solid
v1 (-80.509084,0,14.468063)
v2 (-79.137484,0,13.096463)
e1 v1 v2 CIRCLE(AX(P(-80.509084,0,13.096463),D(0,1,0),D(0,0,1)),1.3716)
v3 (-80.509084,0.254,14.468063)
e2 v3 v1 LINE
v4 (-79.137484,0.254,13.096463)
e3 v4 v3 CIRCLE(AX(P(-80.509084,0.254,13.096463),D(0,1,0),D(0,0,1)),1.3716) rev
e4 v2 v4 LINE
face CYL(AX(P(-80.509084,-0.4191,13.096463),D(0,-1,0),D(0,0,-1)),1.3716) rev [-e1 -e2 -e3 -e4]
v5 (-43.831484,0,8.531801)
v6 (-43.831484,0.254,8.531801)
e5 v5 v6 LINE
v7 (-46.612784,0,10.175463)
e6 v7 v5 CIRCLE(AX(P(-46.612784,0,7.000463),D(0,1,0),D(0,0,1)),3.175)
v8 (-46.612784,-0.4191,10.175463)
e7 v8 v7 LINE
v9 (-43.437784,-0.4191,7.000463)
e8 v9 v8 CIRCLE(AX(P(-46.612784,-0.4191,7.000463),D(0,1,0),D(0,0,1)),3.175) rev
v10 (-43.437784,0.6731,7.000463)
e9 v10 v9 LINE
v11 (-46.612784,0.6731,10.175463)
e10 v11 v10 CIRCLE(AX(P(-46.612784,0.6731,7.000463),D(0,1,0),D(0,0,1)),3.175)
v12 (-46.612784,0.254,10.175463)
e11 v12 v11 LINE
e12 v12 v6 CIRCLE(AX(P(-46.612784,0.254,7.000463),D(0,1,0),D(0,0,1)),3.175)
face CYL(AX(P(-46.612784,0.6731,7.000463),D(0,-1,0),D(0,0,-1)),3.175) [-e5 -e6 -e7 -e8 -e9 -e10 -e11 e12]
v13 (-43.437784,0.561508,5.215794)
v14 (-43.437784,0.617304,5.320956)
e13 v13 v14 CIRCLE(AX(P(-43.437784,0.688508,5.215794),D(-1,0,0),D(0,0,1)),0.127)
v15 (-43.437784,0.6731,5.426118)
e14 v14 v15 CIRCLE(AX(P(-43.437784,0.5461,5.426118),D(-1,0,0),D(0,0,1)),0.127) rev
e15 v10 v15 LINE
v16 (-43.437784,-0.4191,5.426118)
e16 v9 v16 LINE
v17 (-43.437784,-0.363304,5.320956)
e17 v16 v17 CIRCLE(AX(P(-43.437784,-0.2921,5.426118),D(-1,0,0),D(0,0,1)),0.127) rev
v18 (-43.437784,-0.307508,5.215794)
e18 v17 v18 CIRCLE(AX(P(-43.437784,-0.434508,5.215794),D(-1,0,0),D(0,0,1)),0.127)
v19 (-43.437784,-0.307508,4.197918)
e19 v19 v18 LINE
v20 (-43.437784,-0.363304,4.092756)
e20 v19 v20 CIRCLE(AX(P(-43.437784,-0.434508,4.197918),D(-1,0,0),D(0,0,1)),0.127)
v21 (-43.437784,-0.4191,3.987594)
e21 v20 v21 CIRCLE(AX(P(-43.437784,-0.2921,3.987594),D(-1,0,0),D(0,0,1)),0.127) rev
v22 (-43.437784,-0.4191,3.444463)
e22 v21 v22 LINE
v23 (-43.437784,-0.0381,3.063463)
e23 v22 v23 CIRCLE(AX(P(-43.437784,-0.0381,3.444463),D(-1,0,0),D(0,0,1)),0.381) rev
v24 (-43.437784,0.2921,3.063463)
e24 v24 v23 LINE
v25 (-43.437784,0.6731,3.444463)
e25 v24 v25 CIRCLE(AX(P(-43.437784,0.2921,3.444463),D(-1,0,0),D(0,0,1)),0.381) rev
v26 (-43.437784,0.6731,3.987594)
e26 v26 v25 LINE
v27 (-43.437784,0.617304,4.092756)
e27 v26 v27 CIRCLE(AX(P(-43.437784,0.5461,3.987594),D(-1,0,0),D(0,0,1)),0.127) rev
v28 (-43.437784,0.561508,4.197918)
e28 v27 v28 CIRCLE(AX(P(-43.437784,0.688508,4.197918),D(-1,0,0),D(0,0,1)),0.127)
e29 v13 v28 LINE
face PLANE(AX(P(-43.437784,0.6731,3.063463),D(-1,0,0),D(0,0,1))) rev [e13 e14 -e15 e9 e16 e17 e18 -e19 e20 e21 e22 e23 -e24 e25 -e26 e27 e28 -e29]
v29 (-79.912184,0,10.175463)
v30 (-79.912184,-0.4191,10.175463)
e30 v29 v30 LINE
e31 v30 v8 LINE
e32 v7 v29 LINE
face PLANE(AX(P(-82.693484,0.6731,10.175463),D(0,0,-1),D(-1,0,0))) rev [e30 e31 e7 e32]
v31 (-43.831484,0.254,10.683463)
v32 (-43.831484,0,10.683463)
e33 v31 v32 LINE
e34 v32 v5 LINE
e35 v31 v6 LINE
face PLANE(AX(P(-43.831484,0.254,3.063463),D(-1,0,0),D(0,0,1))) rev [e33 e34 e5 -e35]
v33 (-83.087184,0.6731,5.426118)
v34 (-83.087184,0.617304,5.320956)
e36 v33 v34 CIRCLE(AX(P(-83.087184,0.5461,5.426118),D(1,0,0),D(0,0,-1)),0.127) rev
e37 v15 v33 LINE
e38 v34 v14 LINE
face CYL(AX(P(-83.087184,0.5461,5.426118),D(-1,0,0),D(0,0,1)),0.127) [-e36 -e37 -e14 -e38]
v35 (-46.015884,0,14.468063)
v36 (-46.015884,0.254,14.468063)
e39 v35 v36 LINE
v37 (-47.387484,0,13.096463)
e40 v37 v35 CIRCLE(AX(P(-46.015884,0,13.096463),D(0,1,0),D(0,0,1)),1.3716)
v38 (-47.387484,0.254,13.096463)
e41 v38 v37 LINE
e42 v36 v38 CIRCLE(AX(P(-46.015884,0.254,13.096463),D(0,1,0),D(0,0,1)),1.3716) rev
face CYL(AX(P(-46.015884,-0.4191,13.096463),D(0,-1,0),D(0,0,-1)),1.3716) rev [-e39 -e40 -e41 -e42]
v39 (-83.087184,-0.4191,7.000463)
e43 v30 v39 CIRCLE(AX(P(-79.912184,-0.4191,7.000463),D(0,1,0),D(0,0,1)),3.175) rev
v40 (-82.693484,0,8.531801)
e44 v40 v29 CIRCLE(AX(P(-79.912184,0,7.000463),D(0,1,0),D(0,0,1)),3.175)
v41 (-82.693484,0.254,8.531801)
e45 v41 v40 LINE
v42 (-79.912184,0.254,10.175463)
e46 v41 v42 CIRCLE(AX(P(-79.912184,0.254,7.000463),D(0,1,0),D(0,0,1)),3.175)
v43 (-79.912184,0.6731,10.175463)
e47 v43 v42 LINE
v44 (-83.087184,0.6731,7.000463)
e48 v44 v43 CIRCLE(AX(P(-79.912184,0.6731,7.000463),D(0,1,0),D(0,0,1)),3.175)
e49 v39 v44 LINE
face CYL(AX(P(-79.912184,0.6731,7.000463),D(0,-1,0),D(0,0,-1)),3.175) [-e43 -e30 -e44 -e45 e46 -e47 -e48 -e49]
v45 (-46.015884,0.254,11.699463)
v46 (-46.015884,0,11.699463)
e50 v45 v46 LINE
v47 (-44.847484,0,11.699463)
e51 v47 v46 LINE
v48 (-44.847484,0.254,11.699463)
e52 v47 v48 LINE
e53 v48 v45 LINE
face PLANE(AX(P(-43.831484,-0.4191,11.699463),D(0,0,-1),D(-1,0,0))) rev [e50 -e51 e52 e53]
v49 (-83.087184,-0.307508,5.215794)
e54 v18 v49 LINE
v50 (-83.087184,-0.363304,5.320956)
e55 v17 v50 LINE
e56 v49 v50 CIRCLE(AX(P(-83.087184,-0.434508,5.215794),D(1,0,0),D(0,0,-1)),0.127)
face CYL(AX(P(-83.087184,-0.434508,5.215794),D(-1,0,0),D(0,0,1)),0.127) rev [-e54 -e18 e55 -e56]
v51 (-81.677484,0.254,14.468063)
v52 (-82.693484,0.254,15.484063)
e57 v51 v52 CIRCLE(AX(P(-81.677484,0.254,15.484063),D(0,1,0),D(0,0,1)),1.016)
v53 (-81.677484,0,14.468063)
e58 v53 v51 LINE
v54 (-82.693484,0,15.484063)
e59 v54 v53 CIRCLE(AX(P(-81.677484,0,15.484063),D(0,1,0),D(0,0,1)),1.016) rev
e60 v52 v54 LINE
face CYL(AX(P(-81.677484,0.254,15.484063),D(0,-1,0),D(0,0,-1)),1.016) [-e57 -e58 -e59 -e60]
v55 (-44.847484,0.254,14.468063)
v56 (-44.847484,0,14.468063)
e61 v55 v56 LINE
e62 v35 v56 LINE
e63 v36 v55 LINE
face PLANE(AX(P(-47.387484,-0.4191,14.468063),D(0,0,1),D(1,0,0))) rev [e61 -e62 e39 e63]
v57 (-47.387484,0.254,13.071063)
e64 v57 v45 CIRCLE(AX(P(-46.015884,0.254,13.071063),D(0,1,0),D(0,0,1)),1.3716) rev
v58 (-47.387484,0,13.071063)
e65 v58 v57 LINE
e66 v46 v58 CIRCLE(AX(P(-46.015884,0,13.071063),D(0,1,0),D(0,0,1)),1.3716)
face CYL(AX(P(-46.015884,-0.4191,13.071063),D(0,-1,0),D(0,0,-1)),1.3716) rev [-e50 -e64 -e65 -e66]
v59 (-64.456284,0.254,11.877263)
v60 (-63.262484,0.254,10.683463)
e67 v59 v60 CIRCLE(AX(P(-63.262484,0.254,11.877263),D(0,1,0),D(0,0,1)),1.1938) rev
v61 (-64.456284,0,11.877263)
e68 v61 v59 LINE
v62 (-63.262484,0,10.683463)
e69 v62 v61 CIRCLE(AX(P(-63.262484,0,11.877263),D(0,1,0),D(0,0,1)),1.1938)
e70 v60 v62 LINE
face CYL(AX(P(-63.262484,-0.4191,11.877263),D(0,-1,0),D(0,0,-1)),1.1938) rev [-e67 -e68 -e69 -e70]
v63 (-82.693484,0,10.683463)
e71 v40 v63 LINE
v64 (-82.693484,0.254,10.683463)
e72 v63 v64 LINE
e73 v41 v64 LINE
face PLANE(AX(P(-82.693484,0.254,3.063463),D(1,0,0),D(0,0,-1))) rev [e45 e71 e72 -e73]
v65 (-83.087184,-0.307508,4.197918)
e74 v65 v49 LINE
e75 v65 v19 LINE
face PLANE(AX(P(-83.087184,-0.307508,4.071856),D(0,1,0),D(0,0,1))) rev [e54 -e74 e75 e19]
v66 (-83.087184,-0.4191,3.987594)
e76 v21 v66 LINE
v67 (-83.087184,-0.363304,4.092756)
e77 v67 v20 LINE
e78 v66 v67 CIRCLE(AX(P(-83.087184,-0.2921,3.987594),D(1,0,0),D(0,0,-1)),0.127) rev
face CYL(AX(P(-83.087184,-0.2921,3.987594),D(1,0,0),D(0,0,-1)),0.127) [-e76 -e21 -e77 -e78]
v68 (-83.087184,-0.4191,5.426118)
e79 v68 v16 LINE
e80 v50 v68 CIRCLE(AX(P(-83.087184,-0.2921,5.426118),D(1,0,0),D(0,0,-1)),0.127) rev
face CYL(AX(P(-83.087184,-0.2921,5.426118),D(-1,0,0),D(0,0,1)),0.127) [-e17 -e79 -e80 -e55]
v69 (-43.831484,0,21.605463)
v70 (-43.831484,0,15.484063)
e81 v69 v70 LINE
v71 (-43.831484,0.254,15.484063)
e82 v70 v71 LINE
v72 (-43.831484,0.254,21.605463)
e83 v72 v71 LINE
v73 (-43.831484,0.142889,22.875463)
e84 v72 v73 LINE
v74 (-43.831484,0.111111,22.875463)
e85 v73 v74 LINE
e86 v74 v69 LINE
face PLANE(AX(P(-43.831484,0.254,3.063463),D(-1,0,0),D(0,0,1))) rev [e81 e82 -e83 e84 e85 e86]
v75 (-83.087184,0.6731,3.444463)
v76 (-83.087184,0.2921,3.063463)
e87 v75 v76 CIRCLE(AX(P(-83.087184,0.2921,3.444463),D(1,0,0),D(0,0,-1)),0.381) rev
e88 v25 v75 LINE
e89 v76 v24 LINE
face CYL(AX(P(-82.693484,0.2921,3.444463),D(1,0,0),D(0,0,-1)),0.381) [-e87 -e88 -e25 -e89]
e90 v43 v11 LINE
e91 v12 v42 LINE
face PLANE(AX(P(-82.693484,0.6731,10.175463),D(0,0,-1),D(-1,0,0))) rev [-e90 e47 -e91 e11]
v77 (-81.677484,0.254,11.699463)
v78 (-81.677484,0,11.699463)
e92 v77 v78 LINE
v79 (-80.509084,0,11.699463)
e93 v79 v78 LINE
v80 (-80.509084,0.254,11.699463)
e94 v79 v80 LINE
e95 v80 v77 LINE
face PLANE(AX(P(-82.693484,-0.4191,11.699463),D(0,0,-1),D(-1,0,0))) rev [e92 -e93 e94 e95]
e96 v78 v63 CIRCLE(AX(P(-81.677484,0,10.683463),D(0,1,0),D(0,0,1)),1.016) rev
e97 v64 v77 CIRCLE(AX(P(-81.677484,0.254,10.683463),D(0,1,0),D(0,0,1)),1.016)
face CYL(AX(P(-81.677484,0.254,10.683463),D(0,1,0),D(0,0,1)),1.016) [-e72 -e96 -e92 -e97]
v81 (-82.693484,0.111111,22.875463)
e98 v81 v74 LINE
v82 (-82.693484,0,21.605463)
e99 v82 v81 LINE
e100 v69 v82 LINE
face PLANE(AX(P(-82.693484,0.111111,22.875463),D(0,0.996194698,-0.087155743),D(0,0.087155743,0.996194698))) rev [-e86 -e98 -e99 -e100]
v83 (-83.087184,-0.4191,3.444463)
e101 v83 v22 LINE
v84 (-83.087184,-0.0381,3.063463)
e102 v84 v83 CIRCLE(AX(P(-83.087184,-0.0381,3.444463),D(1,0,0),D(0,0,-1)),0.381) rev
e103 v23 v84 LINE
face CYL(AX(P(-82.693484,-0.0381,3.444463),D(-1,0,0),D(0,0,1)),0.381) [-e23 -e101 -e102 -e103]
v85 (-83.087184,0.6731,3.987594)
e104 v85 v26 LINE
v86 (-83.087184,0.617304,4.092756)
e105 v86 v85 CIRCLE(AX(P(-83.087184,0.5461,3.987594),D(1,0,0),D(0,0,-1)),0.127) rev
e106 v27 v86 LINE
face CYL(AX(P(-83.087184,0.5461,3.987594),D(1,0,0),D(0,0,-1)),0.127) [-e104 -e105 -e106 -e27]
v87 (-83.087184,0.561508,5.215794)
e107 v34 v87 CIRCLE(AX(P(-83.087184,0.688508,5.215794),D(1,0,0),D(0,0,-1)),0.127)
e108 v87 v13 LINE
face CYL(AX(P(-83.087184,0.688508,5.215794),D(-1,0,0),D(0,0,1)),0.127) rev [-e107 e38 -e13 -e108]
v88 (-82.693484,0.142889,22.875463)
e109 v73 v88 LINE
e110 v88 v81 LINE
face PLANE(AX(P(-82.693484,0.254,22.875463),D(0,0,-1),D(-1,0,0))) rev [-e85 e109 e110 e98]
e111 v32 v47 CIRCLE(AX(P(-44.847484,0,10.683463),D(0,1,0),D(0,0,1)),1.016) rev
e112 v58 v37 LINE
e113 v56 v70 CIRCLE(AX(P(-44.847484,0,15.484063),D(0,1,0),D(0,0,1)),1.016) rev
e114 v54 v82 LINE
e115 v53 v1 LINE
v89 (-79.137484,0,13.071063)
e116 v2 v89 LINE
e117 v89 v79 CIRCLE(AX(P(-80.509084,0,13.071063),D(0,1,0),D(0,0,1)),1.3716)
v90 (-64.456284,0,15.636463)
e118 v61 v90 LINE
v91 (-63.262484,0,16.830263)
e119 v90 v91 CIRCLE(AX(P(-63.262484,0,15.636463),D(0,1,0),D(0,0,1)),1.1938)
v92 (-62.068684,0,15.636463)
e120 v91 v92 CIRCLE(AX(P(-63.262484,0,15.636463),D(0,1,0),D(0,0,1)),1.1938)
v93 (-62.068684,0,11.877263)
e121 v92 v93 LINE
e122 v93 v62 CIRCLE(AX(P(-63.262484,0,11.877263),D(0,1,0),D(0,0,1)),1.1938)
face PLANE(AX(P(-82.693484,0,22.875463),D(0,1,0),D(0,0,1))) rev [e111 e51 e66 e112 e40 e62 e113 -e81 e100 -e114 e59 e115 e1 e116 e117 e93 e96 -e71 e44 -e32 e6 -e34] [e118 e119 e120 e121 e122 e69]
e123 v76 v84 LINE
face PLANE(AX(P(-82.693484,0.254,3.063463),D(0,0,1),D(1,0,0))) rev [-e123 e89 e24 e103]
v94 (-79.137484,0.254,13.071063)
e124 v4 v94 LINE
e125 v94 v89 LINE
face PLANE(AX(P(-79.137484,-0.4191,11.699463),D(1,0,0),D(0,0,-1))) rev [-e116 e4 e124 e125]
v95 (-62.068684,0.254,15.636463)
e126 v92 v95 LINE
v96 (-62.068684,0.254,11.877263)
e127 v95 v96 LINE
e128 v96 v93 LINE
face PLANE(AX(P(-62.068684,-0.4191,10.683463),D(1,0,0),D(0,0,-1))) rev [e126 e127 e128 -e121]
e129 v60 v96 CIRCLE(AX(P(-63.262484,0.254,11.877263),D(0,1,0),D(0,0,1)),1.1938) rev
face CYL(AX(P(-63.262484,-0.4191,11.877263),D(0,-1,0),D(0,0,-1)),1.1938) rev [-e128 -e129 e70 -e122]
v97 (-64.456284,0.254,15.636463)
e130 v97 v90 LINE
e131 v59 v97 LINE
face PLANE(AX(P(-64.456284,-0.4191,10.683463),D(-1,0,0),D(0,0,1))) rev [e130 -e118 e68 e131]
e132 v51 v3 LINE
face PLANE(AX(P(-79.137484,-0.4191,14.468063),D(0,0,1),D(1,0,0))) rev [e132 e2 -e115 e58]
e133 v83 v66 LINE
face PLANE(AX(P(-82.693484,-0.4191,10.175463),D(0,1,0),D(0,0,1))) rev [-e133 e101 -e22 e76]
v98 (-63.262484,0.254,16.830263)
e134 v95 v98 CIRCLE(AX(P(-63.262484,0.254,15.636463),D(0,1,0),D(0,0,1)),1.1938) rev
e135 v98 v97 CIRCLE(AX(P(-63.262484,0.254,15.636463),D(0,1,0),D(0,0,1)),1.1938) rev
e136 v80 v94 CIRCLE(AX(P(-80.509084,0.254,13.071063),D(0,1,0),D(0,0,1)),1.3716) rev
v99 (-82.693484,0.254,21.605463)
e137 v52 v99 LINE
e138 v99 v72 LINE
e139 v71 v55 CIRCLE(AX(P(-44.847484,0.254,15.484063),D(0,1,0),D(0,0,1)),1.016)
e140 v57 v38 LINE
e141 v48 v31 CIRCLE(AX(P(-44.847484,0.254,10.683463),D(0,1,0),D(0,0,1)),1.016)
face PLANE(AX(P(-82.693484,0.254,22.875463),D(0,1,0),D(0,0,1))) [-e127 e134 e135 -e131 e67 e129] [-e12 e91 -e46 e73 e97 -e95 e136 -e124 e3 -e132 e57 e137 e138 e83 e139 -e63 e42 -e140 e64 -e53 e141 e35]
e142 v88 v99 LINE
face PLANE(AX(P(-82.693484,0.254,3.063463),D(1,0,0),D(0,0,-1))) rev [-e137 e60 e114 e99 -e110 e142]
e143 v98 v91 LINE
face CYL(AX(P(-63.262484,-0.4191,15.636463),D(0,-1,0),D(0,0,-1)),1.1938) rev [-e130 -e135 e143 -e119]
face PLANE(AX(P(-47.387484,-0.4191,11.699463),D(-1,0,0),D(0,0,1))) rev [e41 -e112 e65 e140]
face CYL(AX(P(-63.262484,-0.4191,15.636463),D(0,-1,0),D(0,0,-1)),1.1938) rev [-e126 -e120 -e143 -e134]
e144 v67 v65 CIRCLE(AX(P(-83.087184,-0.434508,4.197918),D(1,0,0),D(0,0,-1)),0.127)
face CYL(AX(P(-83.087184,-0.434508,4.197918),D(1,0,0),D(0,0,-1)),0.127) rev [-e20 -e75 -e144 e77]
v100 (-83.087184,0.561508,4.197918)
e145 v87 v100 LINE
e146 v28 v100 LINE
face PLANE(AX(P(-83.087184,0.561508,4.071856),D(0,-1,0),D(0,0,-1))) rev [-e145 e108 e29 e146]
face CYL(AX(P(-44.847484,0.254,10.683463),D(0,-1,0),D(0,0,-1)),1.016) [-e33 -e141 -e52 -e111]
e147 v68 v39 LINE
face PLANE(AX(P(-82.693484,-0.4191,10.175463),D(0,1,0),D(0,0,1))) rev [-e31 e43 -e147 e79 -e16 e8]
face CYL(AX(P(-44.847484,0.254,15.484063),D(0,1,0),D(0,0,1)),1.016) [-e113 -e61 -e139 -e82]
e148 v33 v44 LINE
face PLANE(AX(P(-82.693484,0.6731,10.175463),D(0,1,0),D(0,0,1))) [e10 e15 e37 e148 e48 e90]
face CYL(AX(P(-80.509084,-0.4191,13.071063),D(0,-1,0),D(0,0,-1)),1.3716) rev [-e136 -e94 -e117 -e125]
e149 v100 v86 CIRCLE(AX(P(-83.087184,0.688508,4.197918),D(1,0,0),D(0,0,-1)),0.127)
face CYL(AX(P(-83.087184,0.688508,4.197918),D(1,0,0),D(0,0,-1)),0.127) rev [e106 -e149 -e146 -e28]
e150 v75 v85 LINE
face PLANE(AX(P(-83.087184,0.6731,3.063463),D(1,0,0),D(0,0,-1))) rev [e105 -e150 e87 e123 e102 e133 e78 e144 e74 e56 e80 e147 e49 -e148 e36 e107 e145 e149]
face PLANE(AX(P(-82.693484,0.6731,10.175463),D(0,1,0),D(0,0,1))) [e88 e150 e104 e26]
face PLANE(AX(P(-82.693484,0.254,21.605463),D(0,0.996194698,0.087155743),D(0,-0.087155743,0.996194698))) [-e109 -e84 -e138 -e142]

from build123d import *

# Parameters (mm, degrees)
SKETCH1_W           = 38.862
SKETCH1_H           = 19.812
BOSS_EXTRUDE1_DEPTH = 0.254
CHAMFER1_SIZE       = 1.27
CHAMFER1_SIZE2      = 0.111110603
CHAMFER2_SIZE       = 1.27
CHAMFER2_SIZE2      = 0.111110603
SKETCH2_W           = 38.862
SKETCH2_H           = 7.112
BOSS_EXTRUDE2_DEPTH = 1.0922
MOVE_FACE1_BY       = 0.3937
MOVE_FACE1_2_BY     = 0.3937
FILLET1_R           = 3.175
FILLET2_R           = 0.381
SKETCH3_W           = 1.27
SKETCH3_H           = 0.642734604
CUT_EXTRUDE1_DEPTH  = 46.780069848
FILLET3_R           = 0.127
FILLET4_R           = 0.127
CUT_EXTRUDE2_DEPTH  = 87.18132095
FILLET5_R           = 1.3716
FILLET6_R           = 1.016
SKETCH5_W           = 2.3876
SKETCH5_H           = 6.1468
CUT_EXTRUDE3_DEPTH  = 87.18132095
FILLET7_R           = 1.1938


# Some blends are built 0.0001 mm under size
with BuildPart() as part:
    # Sketch1 → Boss-Extrude1 (new body)
    with BuildSketch(Plane(origin=(0, 0, 0), x_dir=(1, 0, 0), z_dir=(0, 1, 0))):
        with Locations((-63.262484365, -12.969463084)):
            Rectangle(SKETCH1_W, SKETCH1_H)
    extrude(amount=BOSS_EXTRUDE1_DEPTH)

    # Chamfer1
    chamfer1_edges = [part.edges().sort_by_distance(p)[0] for p in [
        (-63.262484365, 0.254, 22.875463084),
    ]]
    chamfer1_side = [part.faces().sort_by_distance(p)[0] for p in [
        (-63.262484365, 0.254, 12.969463084),
    ]]
    chamfer(chamfer1_edges, length=CHAMFER1_SIZE, length2=CHAMFER1_SIZE2, reference=chamfer1_side[0])

    # Chamfer2
    chamfer2_edges = [part.edges().sort_by_distance(p)[0] for p in [
        (-63.262484365, 0, 22.875463084),
    ]]
    chamfer2_side = [part.faces().sort_by_distance(p)[0] for p in [
        (-63.262484365, 0, 12.969463084),
    ]]
    chamfer(chamfer2_edges, length=CHAMFER2_SIZE, length2=CHAMFER2_SIZE2, reference=chamfer2_side[0])


with BuildPart() as body_2:
    # Sketch2 → Boss-Extrude2 (new body)
    with BuildSketch(Plane(origin=(0, 0.254, 0), x_dir=(-1, 0, 0), z_dir=(0, 1, 0))):
        with Locations((63.262484365, 6.619463084)):
            Rectangle(SKETCH2_W, SKETCH2_H)
    extrude(amount=BOSS_EXTRUDE2_DEPTH)


with BuildPart() as body_2_1:
    # Body-Move/Copy1: moved
    add(body_2.part.moved(Location((0, -0.6731, 0))))

    # Move Face1: a face moved outward by 0.3937
    extrude(body_2_1.faces().sort_by_distance((-82.693484365, 0.127, 6.619463084))[0], amount=MOVE_FACE1_BY, dir=(-1, 0, 0))

    # Move Face1 2: a face moved outward by 0.3937
    extrude(body_2_1.faces().sort_by_distance((-43.831484365, 0.127, 6.619463084))[0], amount=MOVE_FACE1_2_BY, dir=(1, 0, 0))

    # Fillet1
    fillet1_edges = [body_2_1.edges().sort_by_distance(p)[0] for p in [
        (-43.437784365, 0.127, 10.175463084),
        (-83.087184365, 0.127, 10.175463084),
    ]]
    fillet(fillet1_edges, radius=FILLET1_R)


with BuildPart() as part_1:
    add(part.part)

    # Combine1: union body 2
    add(body_2_1.part)

    # Fillet2
    fillet2_edges = [part_1.edges().sort_by_distance(p)[0] for p in [
        (-63.262484365, -0.4191, 3.063463084),
        (-63.262484365, 0.6731, 3.063463084),
    ]]
    fillet(fillet2_edges, radius=FILLET2_R)

    # Sketch3 → Cut-Extrude1 (cut, through all)
    with BuildSketch(Plane(origin=(-43.437784365, 0, 0), x_dir=(0, 0, -1), z_dir=(1, 0, 0))):
        with Locations((-4.706856109, -0.628874986)):
            Rectangle(SKETCH3_W, SKETCH3_H)
        with Locations((-4.706856109, 0.882874986)):
            Rectangle(SKETCH3_W, SKETCH3_H)
    extrude(amount=-CUT_EXTRUDE1_DEPTH, mode=Mode.SUBTRACT)

    # Fillet3
    # the kernel refuses this fillet: 0.127 mm, written as the material it adds along each edge
    with BuildSketch(Plane(origin=(-43.437784365, -0.307507684, 5.341856109), x_dir=(0, 0, -1), z_dir=(-1, 0, 0))) as fillet3_piece_1_section:
        with BuildLine():
            CenterArc((FILLET3_R, FILLET3_R), FILLET3_R, 180, 90)
            Line((0, FILLET3_R), (0, 0))
            Line((0, 0), (FILLET3_R, 0))
        make_face()
    fillet3_piece_1 = extrude(amount=39.6494, mode=Mode.PRIVATE)
    fillet3_piece_1 = split(fillet3_piece_1, bisect_by=Plane(origin=(-63.262484365, -0.4191, 5.312781513), z_dir=(0, 1, 0)), keep=Keep.TOP, mode=Mode.PRIVATE)
    add(fillet3_piece_1)
    with BuildSketch(Plane(origin=(-43.437784365, -0.307507684, 4.071856109), x_dir=(0, -1, 0), z_dir=(-1, 0, 0))) as fillet3_piece_2_section:
        with BuildLine():
            CenterArc((FILLET3_R, FILLET3_R), FILLET3_R, 180, 90)
            Line((0, FILLET3_R), (0, 0))
            Line((0, 0), (FILLET3_R, 0))
        make_face()
    fillet3_piece_2 = extrude(amount=39.6494, mode=Mode.PRIVATE)
    fillet3_piece_2 = split(fillet3_piece_2, bisect_by=Plane(origin=(-63.262484365, -0.4191, 4.100930704), z_dir=(0, 1, 0)), keep=Keep.TOP, mode=Mode.PRIVATE)
    add(fillet3_piece_2)
    with BuildSketch(Plane(origin=(-43.437784365, 0.561507684, 5.341856109), x_dir=(0, 1, 0), z_dir=(-1, 0, 0))) as fillet3_piece_3_section:
        with BuildLine():
            CenterArc((FILLET3_R, FILLET3_R), FILLET3_R, 180, 90)
            Line((0, FILLET3_R), (0, 0))
            Line((0, 0), (FILLET3_R, 0))
        make_face()
    fillet3_piece_3 = extrude(amount=39.6494, mode=Mode.PRIVATE)
    fillet3_piece_3 = split(fillet3_piece_3, bisect_by=Plane(origin=(-63.262484365, 0.6731, 5.312781513), z_dir=(0, -1, 0)), keep=Keep.TOP, mode=Mode.PRIVATE)
    add(fillet3_piece_3)
    with BuildSketch(Plane(origin=(-43.437784365, 0.561507684, 4.071856109), x_dir=(0, 0, 1), z_dir=(-1, 0, 0))) as fillet3_piece_4_section:
        with BuildLine():
            CenterArc((FILLET3_R, FILLET3_R), FILLET3_R, 180, 90)
            Line((0, FILLET3_R), (0, 0))
            Line((0, 0), (FILLET3_R, 0))
        make_face()
    fillet3_piece_4 = extrude(amount=39.6494, mode=Mode.PRIVATE)
    fillet3_piece_4 = split(fillet3_piece_4, bisect_by=Plane(origin=(-63.262484365, 0.6731, 4.100930704), z_dir=(0, -1, 0)), keep=Keep.TOP, mode=Mode.PRIVATE)
    add(fillet3_piece_4)

    # Fillet4
    fillet4_edges = [part_1.edges().sort_by_distance(p)[0] for p in [
        (-63.262484365, -0.4191, 5.340918011),
        (-63.262484365, -0.4191, 4.072794206),
        (-63.262484365, 0.6731, 5.340918011),
        (-63.262484365, 0.6731, 4.072794206),
    ]]
    fillet(fillet4_edges, radius=FILLET4_R)

    # Sketch4 → Cut-Extrude2 (cut, through all)
    with BuildSketch(Plane(origin=(0, 0.254, 0), x_dir=(-1, 0, 0), z_dir=(0, 1, 0))):
        Polygon((82.693484365, 11.699463084), (79.137484365, 11.699463084), (79.137484365, 14.468063084), (84.344362943, 14.468063084), (84.344362943, 11.699463084), align=None)
        Polygon((47.387484365, 14.468063084), (42.180605788, 14.468063084), (42.180605788, 11.699463084), (43.831484365, 11.699463084), (47.387484365, 11.699463084), align=None)
    extrude(amount=-CUT_EXTRUDE2_DEPTH, mode=Mode.SUBTRACT)

    # Fillet5
    fillet5_edges = [part_1.edges().sort_by_distance(p)[0] for p in [
        (-79.137484365, 0.127, 11.699463084),
        (-79.137484365, 0.127, 14.468063084),
        (-47.387484365, 0.127, 14.468063084),
        (-47.387484365, 0.127, 11.699463084),
    ]]
    fillet(fillet5_edges, radius=FILLET5_R)

    # Fillet6
    fillet6_edges = [part_1.edges().sort_by_distance(p)[0] for p in [
        (-82.693484365, 0.127, 11.699463084),
        (-82.693484365, 0.127, 14.468063084),
        (-43.831484365, 0.127, 11.699463084),
        (-43.831484365, 0.127, 14.468063084),
    ]]
    fillet(fillet6_edges, radius=FILLET6_R)

    # Sketch5 → Cut-Extrude3 (cut, through all)
    with BuildSketch(Plane(origin=(0, 0.254, 0), x_dir=(1, 0, 0), z_dir=(0, 1, 0))):
        with Locations((-63.262484365, -13.756863084)):
            Rectangle(SKETCH5_W, SKETCH5_H)
    extrude(amount=-CUT_EXTRUDE3_DEPTH, mode=Mode.SUBTRACT)

    # Fillet7
    fillet7_edges = [part_1.edges().sort_by_distance(p)[0] for p in [
        (-64.456284365, 0.127, 16.830263084),
        (-62.068684365, 0.127, 16.830263084),
        (-62.068684365, 0.127, 10.683463084),
        (-64.456284365, 0.127, 10.683463084),
    ]]
    fillet(fillet7_edges, radius=FILLET7_R - 0.0001)  # a hair under: the kernel refuses the full size


solid = part_1.part
